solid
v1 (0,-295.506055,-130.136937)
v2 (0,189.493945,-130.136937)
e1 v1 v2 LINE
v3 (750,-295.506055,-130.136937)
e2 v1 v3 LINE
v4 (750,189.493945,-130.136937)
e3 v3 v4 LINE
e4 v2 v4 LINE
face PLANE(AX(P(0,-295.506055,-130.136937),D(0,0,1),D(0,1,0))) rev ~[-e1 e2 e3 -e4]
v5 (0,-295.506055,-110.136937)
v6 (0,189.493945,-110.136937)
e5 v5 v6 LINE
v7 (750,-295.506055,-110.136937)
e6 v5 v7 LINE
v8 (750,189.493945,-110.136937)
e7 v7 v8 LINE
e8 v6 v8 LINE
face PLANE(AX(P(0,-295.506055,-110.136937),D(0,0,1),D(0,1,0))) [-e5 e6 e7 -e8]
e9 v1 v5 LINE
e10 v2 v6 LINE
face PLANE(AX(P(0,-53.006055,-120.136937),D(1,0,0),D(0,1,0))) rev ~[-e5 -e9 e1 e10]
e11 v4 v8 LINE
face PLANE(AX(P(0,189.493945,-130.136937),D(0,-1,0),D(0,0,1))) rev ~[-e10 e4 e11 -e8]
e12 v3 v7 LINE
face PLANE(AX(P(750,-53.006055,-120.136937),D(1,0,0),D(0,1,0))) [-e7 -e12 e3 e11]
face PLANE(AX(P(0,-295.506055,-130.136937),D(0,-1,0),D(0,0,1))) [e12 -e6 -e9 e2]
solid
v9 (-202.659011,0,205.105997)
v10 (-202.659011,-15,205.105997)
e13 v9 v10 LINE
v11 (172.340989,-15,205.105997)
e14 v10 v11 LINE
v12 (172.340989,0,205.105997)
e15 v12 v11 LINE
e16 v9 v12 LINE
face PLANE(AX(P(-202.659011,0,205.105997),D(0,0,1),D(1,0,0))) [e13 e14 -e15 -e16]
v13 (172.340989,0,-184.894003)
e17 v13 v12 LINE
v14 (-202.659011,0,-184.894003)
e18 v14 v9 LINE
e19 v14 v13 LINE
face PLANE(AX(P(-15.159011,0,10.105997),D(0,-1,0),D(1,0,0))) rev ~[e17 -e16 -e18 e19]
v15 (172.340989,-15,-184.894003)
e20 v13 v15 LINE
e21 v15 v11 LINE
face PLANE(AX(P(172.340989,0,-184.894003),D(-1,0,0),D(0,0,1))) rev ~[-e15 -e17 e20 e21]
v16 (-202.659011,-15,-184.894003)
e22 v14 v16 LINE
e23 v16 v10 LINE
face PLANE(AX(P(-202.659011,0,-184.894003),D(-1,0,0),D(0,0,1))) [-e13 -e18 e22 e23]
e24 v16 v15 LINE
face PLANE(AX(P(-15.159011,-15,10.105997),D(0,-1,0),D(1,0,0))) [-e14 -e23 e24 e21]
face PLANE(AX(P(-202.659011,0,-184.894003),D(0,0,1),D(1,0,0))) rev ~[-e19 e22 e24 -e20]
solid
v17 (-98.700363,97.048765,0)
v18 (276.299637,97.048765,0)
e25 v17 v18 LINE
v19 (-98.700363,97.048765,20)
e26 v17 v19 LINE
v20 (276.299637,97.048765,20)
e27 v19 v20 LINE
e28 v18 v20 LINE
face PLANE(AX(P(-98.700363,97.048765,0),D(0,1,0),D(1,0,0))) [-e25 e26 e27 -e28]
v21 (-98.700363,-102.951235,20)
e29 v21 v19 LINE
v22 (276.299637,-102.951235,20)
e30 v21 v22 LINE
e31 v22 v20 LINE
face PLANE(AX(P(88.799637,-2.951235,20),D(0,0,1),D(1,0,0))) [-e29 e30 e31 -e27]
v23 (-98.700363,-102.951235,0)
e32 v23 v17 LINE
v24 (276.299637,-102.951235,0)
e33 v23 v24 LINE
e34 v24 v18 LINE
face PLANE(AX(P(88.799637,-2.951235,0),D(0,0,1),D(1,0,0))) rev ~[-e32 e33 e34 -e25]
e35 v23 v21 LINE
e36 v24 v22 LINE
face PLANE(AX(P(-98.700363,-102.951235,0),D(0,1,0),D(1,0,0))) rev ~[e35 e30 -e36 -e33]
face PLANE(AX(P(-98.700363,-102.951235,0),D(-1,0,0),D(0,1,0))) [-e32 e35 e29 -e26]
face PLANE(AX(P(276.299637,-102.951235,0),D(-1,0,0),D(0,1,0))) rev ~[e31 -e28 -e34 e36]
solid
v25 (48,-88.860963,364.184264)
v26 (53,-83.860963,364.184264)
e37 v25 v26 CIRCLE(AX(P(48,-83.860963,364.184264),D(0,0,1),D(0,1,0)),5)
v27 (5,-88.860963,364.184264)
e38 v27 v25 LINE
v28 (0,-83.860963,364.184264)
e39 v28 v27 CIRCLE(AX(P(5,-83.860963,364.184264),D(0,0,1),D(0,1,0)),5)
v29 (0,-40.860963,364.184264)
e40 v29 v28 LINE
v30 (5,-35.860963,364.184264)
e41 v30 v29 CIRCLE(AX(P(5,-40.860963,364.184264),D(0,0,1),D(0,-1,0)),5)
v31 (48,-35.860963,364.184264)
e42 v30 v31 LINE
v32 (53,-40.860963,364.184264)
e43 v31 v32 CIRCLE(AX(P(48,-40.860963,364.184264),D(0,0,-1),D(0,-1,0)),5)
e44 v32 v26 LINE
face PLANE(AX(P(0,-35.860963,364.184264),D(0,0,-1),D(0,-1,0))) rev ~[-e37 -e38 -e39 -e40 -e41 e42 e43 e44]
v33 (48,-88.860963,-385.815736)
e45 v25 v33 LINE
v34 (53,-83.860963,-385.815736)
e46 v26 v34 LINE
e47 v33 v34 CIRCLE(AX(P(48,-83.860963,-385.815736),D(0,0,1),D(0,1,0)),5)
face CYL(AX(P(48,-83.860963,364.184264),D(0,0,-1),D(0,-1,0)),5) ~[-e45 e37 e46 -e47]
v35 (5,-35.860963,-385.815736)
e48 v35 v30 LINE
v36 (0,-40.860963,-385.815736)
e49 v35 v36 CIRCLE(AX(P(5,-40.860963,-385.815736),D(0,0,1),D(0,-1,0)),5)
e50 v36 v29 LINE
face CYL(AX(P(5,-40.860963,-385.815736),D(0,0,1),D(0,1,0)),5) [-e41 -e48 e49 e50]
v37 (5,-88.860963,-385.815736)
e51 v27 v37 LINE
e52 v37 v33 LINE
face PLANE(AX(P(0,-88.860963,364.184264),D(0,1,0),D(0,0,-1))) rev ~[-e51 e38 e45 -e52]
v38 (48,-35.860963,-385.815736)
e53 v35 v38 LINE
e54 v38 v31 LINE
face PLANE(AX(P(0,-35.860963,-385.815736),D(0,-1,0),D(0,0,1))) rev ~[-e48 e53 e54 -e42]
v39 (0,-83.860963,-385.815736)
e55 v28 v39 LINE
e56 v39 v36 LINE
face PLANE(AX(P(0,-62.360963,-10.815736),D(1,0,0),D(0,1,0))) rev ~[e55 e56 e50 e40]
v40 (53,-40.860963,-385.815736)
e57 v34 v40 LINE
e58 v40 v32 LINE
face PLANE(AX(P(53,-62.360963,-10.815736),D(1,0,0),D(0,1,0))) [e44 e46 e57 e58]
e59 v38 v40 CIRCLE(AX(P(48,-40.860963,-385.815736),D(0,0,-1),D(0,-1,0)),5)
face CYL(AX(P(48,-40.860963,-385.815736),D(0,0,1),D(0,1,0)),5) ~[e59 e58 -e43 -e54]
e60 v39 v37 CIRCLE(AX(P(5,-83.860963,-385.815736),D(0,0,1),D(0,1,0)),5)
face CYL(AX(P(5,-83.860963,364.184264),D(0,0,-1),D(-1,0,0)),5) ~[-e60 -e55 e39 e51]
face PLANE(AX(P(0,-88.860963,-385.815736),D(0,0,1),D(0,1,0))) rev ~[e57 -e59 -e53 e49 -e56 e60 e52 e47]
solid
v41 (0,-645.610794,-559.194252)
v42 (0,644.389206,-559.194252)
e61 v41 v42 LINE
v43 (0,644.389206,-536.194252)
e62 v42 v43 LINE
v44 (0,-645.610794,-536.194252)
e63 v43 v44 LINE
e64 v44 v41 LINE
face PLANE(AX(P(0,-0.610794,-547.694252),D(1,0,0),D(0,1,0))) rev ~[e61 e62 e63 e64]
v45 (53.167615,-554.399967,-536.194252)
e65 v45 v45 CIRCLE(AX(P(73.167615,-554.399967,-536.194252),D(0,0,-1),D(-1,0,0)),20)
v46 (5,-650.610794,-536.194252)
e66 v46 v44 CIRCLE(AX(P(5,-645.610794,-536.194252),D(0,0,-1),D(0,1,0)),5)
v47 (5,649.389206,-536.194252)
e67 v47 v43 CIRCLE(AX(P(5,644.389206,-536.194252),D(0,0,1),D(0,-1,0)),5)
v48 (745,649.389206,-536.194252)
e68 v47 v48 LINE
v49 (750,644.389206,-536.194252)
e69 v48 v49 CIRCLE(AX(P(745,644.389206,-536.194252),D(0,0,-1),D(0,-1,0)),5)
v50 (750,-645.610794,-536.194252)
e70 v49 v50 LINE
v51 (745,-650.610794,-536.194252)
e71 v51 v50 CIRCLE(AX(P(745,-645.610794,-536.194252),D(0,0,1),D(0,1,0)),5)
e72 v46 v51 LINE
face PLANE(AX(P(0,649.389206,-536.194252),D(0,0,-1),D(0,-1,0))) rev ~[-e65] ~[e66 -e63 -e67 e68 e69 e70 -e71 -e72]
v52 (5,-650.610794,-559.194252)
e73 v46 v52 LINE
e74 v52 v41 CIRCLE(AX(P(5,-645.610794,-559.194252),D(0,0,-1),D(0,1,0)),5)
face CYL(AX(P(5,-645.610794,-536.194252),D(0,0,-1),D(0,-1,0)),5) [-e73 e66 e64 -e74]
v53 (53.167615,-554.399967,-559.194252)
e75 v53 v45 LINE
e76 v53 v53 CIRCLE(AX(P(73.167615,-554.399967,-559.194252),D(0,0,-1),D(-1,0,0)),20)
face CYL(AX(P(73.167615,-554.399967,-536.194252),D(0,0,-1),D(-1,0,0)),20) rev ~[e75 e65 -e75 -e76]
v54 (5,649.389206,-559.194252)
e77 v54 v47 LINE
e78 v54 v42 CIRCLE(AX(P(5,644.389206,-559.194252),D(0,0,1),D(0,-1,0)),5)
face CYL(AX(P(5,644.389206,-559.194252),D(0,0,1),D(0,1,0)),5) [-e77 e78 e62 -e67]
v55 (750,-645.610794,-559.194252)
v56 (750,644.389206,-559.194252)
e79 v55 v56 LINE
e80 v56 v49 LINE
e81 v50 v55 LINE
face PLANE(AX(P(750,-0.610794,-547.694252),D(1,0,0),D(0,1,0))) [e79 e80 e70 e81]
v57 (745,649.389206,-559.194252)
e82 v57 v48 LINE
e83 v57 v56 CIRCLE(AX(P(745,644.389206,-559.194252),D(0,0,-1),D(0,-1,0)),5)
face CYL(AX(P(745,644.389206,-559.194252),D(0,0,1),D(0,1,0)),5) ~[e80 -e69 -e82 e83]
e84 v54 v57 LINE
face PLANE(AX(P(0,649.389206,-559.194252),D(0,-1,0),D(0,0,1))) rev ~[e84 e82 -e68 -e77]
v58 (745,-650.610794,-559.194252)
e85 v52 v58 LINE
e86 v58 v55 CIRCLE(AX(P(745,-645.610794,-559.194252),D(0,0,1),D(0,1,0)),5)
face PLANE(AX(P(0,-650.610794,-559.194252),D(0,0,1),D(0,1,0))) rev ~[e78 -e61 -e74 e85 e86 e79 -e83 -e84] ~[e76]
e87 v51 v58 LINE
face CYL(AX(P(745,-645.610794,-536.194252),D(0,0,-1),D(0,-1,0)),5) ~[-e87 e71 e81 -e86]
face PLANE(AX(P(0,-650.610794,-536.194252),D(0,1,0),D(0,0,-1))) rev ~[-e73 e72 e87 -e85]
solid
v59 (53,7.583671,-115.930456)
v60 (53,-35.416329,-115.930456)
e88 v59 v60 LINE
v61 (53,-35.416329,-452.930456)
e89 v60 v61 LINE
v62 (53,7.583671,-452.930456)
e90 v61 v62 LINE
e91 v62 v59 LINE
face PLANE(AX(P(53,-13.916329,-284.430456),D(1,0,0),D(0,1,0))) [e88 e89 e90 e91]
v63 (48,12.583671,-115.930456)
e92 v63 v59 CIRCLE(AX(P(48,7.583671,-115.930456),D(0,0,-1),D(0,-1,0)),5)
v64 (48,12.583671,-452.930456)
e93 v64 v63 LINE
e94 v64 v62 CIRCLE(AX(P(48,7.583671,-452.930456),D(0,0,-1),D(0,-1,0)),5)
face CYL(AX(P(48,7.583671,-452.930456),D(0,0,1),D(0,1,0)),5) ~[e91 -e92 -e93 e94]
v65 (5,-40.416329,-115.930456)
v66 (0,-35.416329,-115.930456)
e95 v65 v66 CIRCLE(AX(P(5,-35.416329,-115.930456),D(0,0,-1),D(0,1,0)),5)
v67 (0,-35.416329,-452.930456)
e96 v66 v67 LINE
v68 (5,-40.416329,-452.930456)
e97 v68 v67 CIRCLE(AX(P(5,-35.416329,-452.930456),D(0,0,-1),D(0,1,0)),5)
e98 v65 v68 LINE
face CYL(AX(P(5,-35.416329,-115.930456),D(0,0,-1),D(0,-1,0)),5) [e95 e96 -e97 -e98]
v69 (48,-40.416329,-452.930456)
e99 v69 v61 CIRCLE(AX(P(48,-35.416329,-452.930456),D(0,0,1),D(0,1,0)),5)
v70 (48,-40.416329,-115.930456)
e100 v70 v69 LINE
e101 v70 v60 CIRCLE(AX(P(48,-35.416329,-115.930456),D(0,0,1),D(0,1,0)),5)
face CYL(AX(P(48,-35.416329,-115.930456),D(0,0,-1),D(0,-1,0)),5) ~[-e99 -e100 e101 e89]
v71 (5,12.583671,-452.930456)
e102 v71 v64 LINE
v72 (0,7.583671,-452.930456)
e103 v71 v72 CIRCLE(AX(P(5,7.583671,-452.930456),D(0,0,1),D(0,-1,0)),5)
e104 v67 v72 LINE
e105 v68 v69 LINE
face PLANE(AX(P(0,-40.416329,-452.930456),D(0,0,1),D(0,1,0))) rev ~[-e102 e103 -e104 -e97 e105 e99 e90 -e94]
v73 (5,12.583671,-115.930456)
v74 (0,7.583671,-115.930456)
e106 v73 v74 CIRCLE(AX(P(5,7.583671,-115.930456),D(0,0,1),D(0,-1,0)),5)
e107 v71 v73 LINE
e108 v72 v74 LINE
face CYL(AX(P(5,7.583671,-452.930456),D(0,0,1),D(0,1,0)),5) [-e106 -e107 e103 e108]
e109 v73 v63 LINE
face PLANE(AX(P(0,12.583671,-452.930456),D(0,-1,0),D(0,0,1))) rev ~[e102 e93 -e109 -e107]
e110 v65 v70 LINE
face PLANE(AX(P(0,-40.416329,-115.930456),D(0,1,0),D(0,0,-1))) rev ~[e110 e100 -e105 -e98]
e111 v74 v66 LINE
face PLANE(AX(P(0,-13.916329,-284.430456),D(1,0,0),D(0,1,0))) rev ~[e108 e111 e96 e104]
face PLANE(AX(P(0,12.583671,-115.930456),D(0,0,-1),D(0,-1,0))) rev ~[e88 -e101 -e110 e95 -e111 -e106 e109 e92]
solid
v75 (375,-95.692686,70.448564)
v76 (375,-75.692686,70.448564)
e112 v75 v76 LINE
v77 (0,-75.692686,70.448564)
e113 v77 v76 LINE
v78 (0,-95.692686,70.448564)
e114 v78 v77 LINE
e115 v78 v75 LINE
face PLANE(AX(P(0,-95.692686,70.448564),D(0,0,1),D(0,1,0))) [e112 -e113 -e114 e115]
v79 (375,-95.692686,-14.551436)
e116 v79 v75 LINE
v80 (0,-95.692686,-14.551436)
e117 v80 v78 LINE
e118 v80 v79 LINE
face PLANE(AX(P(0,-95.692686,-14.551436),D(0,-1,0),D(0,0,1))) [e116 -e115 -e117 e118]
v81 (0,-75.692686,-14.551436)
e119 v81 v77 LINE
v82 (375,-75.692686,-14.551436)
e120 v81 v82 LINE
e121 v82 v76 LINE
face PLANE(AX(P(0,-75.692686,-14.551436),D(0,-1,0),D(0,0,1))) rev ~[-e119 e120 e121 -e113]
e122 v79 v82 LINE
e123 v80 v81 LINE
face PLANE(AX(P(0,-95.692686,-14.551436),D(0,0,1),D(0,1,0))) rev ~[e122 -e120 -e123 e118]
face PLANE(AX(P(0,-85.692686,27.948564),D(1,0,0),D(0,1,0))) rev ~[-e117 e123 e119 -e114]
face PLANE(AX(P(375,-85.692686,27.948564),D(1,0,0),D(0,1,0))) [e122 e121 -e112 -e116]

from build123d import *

# Parameters (mm, degrees)
F1_DEPTH        = 750
F3_DEPTH        = 53
F5_DEPTH        = 53
F6_R            = 5
F6_2_R          = 5
F6_3_R          = 5
F7_R            = 5
F9_W            = 375
F9_H            = 390
F10_DEPTH       = 15
F11_W           = 375
F11_H           = 200
F12_DEPTH       = 20
F13_W           = 485
F13_H           = 20
F14_DEPTH       = 750
F16_D           = 40
F16_DEPTH       = 40
F16_CBORE_D     = 40
F16_CBORE_DEPTH = 5
F16_TIP         = 12.0172123806
F17_W           = 20
F17_H           = 85
F18_DEPTH       = 375


# Not quite as in the source:
# - two fillets or chamfers of one size are made in one step


with BuildPart() as f1:
    # F0 (on Right) → F1 (new body)
    with BuildSketch(Plane.YZ):
        Polygon((649.3892060593, -536.194252491), (-650.6107939407, -536.194252491), (-650.6107939407, -559.194252491), (-635.6107939407, -559.194252491), (-435.6107939407, -559.194252491), (-420.6107939407, -559.194252491), (-417.3657000065, -559.194252491), (-399.3657000065, -559.194252491), (549.3892060593, -559.194252491), (569.3892060593, -559.194252491), (649.3892060593, -559.194252491), align=None)
    extrude(amount=F1_DEPTH)

    # F6
    f6_edges = [f1.edges().sort_by_distance(p)[0] for p in [
        (750, -650.610794, -547.694252),
        (750, 649.389206, -547.694252),
        (0, 649.389206, -547.694252),
        (0, -650.610794, -547.694252),
    ]]
    fillet(f6_edges, radius=F6_R)

    # F16
    with Locations(Plane.XY.offset(-536.194252491)):
        with Locations((73.1676146388, -554.3999671936)):
            CounterBoreHole(F16_D / 2, F16_CBORE_D / 2, F16_CBORE_DEPTH, depth=F16_DEPTH)
            with Locations((0, 0, -(F16_DEPTH + F16_TIP / 2))):  # 118° drill point
                Cone(0, F16_D / 2, F16_TIP, mode=Mode.SUBTRACT)


with BuildPart() as f3:
    # F2 (on Right) → F3 (new body)
    with BuildSketch(Plane.YZ):
        Polygon((-35.8609634377, 364.1842640936), (-88.8609634377, 364.1842640936), (-88.8609634377, 341.5341340936), (-88.8609634377, 142.1397668123), (-88.8609634377, 122.1397668123), (-88.8609634377, 4.1842640936), (-88.8609634377, -10.8157359064), (-88.8609634377, -385.8157359064), (-35.8609634377, -385.8157359064), align=None)
    extrude(amount=F3_DEPTH)

    # F6#2
    f6_2_edges = [f3.edges().sort_by_distance(p)[0] for p in [
        (53, -88.860963, -10.815736),
        (53, -35.860963, -10.815736),
        (0, -35.860963, -10.815736),
    ]]
    fillet(f6_2_edges, radius=F6_2_R)

    # F7
    f7_edges = [f3.edges().sort_by_distance(p)[0] for p in [
        (0, -88.860963, -10.815736),
    ]]
    fillet(f7_edges, radius=F7_R)


with BuildPart() as f5:
    # F4 (on Right) → F5 (new body)
    with BuildSketch(Plane.YZ):
        Polygon((12.5836707864, -115.9304558238), (-40.4163292136, -115.9304558238), (-40.4163292136, -138.5805858238), (-40.4163292136, -269.4304558238), (-40.4163292136, -284.4304558238), (-40.4163292136, -452.9304558238), (12.5836707864, -452.9304558238), align=None)
    extrude(amount=F5_DEPTH)

    # F6#3
    f6_3_edges = [f5.edges().sort_by_distance(p)[0] for p in [
        (0, 12.583671, -284.430456),
        (53, 12.583671, -284.430456),
        (53, -40.416329, -284.430456),
        (0, -40.416329, -284.430456),
    ]]
    fillet(f6_3_edges, radius=F6_3_R)


with BuildPart() as f10:
    # F9 (on Front) → F10 (new body)
    with BuildSketch(Plane.XZ):
        with Locations((-15.1590108871, 10.105997324)):
            Rectangle(F9_W, F9_H)
    extrude(amount=F10_DEPTH)


with BuildPart() as f12:
    # F11 (on Top) → F12 (new body)
    with BuildSketch(Plane.XY):
        with Locations((88.7996369725, -2.9512345791)):
            Rectangle(F11_W, F11_H)
    extrude(amount=F12_DEPTH)


with BuildPart() as f14:
    # F13 (on Right) → F14 (new body)
    with BuildSketch(Plane.YZ):
        with Locations((-53.0060548335, -120.13693689)):
            Rectangle(F13_W, F13_H)
    extrude(amount=F14_DEPTH)


with BuildPart() as f18:
    # F17 (on Right) → F18 (new body)
    with BuildSketch(Plane.YZ):
        with Locations((-85.6926859457, 27.9485643841)):
            Rectangle(F17_W, F17_H)
    extrude(amount=F18_DEPTH)


solid = Compound([f1.part, f3.part, f5.part, f10.part, f12.part, f14.part, f18.part])
